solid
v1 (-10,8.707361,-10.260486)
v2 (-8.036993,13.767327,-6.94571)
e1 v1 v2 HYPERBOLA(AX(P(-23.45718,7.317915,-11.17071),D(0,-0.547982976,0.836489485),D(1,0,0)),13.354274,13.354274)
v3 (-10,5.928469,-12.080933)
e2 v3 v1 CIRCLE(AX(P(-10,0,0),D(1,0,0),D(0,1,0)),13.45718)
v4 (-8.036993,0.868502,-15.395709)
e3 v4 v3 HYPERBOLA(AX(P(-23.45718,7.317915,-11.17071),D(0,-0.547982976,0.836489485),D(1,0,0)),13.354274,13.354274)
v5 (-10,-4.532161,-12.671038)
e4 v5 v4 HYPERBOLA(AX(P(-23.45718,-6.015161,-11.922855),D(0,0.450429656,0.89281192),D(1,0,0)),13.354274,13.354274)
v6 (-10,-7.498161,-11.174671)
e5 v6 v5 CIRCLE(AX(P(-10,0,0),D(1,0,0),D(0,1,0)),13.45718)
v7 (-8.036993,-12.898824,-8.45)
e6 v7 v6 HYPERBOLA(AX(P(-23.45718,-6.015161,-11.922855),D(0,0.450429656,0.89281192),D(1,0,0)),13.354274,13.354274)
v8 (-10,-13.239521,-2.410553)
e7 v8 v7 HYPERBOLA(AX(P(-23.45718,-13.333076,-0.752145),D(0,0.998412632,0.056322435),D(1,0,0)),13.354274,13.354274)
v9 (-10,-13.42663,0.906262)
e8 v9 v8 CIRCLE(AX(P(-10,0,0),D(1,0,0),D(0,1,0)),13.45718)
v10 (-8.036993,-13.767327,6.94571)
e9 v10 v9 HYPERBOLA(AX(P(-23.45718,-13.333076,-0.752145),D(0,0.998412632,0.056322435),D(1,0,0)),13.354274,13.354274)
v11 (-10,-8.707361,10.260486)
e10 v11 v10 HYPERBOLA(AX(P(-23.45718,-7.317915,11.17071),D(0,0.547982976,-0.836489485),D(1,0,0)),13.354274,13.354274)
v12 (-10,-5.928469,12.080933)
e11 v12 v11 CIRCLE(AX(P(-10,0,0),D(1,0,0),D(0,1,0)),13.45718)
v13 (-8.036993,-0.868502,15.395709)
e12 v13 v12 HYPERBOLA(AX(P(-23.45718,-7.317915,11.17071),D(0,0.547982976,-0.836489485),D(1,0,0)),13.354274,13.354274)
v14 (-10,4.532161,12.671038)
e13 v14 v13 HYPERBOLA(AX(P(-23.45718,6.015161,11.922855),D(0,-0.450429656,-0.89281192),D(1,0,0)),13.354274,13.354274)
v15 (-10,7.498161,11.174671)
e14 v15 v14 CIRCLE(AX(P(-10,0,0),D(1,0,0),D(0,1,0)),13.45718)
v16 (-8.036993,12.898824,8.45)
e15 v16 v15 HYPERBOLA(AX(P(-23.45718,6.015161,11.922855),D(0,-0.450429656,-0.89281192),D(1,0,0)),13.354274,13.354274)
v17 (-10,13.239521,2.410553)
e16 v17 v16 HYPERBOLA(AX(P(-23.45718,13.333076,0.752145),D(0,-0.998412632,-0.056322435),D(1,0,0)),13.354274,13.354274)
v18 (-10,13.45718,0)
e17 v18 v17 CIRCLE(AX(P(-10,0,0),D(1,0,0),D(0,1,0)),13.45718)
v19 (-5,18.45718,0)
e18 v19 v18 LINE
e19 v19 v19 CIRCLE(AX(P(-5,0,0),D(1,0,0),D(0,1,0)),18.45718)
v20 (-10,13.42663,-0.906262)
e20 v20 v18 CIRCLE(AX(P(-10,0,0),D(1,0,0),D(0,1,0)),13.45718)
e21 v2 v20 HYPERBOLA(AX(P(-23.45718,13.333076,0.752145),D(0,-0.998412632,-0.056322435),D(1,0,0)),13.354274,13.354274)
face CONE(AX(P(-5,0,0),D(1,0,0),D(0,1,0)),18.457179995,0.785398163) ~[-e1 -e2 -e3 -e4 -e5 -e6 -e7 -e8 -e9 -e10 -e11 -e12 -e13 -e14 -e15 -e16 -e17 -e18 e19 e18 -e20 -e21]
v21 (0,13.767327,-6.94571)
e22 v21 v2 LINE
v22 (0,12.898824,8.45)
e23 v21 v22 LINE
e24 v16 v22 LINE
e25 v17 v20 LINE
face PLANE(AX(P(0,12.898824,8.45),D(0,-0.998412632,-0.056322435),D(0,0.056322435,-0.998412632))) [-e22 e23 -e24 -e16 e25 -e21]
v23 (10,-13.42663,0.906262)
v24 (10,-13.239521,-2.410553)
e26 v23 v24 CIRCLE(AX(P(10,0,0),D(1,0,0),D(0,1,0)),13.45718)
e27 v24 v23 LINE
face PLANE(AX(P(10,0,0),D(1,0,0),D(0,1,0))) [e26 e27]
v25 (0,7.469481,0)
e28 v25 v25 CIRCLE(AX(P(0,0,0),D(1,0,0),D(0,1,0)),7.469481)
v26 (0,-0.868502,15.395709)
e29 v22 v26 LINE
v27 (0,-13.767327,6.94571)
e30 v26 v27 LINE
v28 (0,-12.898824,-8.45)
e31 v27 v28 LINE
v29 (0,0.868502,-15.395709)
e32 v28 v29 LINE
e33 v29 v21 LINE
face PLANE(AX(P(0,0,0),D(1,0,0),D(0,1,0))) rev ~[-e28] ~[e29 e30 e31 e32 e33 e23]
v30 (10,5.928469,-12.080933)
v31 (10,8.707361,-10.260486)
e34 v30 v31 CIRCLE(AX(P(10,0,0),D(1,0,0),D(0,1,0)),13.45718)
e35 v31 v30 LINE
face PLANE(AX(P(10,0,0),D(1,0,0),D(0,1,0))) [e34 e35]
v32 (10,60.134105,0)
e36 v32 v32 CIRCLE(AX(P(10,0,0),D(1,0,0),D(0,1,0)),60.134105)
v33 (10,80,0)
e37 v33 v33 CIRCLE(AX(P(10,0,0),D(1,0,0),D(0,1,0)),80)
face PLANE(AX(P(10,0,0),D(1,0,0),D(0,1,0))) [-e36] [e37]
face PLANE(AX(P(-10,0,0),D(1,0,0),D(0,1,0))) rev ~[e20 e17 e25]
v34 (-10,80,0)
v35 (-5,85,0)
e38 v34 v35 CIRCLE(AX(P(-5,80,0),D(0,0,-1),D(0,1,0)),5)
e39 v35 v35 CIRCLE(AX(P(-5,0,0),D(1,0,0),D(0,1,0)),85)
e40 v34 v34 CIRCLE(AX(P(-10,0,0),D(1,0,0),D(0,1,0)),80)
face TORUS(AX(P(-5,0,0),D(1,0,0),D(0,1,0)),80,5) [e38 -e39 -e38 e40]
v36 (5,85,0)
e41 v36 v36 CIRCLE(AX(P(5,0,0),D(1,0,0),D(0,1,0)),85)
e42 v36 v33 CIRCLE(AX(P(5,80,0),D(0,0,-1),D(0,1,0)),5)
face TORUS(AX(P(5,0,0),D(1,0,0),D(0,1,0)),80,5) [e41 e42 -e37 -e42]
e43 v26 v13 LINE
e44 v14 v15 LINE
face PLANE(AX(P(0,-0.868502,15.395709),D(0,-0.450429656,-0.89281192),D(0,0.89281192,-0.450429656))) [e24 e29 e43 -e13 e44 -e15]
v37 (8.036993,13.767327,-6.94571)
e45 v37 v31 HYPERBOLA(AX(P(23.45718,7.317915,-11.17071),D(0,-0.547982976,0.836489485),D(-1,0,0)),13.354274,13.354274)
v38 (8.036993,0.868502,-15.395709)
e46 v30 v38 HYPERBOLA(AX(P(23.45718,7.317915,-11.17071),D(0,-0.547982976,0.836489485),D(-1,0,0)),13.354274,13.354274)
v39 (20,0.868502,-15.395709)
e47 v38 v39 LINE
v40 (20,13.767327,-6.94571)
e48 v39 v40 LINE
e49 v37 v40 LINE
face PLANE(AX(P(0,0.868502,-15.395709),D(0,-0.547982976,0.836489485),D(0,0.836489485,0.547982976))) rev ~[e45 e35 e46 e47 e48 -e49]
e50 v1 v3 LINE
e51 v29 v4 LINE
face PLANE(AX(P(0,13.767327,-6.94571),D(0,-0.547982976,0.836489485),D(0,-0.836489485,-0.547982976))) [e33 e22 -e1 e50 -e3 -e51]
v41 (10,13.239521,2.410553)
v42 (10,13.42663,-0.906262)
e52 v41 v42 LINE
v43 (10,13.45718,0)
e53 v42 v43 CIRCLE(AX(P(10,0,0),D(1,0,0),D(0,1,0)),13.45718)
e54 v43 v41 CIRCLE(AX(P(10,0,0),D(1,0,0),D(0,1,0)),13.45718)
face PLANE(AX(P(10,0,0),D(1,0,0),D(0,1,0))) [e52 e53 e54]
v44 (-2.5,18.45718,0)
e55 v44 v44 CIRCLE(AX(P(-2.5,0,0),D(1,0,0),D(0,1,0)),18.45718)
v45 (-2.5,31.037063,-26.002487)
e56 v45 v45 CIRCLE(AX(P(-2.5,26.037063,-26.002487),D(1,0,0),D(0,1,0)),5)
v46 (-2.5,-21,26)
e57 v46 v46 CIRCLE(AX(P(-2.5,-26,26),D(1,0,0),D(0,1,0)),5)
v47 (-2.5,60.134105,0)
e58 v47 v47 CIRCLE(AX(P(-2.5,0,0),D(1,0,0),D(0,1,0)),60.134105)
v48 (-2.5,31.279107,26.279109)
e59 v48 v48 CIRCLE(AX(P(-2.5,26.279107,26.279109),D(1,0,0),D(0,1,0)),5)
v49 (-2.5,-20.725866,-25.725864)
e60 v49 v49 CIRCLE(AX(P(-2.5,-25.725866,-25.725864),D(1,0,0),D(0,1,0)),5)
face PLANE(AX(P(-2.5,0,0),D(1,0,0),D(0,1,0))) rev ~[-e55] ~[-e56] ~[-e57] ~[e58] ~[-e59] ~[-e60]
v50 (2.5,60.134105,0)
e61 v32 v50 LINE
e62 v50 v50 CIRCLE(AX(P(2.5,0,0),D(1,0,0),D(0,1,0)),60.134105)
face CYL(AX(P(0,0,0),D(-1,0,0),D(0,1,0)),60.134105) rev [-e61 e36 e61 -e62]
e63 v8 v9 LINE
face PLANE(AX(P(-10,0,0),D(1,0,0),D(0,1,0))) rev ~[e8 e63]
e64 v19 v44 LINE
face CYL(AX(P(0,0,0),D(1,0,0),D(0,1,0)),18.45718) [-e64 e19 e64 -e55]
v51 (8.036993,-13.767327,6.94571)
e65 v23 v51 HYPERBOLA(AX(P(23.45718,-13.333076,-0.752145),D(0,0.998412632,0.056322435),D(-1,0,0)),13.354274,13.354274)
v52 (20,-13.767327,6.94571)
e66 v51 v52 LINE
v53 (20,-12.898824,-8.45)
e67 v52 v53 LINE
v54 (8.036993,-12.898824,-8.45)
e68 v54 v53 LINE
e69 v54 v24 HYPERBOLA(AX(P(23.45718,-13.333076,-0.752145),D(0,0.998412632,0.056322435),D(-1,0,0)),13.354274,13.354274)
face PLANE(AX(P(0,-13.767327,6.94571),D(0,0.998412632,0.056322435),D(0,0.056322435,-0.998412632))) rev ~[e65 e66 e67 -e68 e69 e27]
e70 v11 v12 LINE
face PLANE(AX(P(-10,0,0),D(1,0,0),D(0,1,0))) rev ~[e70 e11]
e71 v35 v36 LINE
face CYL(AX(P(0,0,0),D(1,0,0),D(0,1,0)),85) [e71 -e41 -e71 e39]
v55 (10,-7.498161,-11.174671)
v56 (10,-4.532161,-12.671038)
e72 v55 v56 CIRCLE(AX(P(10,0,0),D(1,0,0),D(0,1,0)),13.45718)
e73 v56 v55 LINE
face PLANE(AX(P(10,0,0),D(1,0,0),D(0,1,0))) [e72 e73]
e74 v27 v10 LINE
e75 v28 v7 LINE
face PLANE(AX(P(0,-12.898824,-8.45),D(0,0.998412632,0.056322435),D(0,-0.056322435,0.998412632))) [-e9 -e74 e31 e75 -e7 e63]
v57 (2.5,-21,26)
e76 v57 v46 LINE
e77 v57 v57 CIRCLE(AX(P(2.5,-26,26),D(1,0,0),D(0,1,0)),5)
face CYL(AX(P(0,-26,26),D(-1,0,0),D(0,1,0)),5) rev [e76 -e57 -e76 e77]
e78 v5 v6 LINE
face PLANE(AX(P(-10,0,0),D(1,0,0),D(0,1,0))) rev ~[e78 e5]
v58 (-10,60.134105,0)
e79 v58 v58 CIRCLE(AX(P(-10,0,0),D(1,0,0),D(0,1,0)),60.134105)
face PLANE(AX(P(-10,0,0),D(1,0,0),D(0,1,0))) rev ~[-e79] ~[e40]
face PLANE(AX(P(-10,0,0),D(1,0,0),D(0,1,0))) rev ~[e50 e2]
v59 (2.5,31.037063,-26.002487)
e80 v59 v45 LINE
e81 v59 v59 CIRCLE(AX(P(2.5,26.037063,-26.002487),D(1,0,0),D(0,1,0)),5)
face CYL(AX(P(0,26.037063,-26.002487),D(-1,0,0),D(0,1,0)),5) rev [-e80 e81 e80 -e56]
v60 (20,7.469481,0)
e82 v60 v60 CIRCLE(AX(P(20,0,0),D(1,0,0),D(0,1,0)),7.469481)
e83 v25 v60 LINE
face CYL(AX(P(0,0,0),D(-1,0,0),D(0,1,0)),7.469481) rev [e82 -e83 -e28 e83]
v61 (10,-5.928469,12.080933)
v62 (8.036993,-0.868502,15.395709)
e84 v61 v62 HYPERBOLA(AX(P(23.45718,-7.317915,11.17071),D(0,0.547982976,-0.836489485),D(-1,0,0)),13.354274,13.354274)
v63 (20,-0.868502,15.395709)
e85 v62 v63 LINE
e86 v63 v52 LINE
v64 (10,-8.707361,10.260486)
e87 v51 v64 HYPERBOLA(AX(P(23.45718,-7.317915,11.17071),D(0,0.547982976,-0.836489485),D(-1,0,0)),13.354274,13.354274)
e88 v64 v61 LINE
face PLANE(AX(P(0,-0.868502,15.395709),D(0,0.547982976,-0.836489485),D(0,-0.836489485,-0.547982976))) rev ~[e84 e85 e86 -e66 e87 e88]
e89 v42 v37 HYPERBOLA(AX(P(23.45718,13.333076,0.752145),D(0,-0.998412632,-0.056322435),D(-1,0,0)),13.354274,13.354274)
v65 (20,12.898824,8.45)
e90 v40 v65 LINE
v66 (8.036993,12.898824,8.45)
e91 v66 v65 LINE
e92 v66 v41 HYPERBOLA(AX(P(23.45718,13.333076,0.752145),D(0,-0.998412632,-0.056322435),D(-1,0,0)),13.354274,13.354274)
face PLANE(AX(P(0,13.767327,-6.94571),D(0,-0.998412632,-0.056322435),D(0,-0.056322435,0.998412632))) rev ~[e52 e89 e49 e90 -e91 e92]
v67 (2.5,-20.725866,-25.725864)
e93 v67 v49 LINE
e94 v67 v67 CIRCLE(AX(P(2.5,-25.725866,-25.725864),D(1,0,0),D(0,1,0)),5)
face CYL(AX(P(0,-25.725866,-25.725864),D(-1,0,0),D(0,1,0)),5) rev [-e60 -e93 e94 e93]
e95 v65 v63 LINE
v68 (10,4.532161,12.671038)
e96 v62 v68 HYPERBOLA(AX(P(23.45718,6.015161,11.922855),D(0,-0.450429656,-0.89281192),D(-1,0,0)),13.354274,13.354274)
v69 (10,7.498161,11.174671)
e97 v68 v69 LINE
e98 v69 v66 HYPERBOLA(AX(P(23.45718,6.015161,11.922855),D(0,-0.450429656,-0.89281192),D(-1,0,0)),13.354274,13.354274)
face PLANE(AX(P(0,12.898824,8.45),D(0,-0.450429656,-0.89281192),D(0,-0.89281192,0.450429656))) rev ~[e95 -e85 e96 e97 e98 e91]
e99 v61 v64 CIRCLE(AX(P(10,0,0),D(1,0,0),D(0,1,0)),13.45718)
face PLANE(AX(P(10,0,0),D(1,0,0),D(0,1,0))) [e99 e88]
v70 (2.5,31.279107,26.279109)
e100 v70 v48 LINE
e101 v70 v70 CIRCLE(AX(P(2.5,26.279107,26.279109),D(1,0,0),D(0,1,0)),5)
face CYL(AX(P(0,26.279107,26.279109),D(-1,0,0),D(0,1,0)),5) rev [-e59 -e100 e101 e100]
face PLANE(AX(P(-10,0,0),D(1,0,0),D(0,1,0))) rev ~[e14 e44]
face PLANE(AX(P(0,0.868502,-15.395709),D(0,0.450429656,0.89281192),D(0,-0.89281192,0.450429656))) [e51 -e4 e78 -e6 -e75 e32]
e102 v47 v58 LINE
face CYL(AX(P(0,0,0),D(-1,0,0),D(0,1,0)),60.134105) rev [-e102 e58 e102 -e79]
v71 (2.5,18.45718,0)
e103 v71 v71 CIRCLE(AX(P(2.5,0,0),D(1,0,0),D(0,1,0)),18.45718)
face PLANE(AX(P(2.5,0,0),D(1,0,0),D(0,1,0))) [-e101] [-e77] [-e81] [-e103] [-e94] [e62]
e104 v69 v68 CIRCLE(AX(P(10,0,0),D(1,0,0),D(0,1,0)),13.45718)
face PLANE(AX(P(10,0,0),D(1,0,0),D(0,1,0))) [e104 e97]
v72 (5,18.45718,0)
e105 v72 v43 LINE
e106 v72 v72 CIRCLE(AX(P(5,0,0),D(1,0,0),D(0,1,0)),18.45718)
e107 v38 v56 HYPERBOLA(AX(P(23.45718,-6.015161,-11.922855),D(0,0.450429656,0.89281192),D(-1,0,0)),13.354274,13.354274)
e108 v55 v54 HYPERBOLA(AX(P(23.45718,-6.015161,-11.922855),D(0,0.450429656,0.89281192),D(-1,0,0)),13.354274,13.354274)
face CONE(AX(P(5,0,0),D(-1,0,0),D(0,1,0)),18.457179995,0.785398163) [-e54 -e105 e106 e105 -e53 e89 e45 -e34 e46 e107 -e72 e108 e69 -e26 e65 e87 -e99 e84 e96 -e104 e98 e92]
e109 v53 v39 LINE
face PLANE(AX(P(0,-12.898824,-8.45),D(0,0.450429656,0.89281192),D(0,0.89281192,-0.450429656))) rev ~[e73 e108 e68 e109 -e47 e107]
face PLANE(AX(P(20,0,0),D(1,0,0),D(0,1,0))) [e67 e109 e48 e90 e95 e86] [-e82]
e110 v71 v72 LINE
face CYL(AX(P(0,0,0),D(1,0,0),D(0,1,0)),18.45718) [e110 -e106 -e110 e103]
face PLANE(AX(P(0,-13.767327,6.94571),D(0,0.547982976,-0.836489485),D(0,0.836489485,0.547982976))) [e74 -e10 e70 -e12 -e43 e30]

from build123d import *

# Parameters (mm, degrees)
F0_R     = 85
F0_R_2   = 60.1341050947
F1_DEPTH = 10
F0_R_3   = 5
F0_R_4   = 18.4571799951
F2_DEPTH = 2.5
F3_DEPTH = 10
F4_R     = 5
F0_R_5   = 7.4694808043
F6_DEPTH = 20


# Not quite as in the source:
# - a fillet or chamfer that OpenCascade refuses, or shapes differently, is made with other operations: its cross-section is extruded or revolved along the edge and cut away or added


with BuildPart() as f1:
    # F0 (on Right) → F1 (new body, symmetric)
    with BuildSketch(Plane.YZ):
        Circle(F0_R)
        Circle(F0_R_2, mode=Mode.SUBTRACT)
    extrude(amount=F1_DEPTH, both=True)

    # F0 (on Right) → F2 (join, symmetric)
    with BuildSketch(Plane.YZ):
        Circle(F0_R_2)
        with Locations((-25.7258657366, -25.725863874)):
            Circle(F0_R_3, mode=Mode.SUBTRACT)
        with Locations((26.0370634496, -26.0024871677)):
            Circle(F0_R_3, mode=Mode.SUBTRACT)
        with Locations((-26, 26)):
            Circle(F0_R_3, mode=Mode.SUBTRACT)
        Circle(F0_R_4, mode=Mode.SUBTRACT)
        with Locations((26.2791067362, 26.2791085988)):
            Circle(F0_R_3, mode=Mode.SUBTRACT)
    extrude(amount=F2_DEPTH, both=True)

    # F0 (on Right) → F3 (join, symmetric)
    with BuildSketch(Plane.YZ):
        Circle(F0_R_4)
        Polygon((12.8988242803, 8.4499999602), (13.7673267676, -6.9457095256), (0.8685024874, -15.3957094858), (-12.8988242803, -8.4499999602), (-13.7673267676, 6.9457095256), (-0.8685024874, 15.3957094858), align=None, mode=Mode.SUBTRACT)
    extrude(amount=F3_DEPTH, both=True)

    # F4
    f4_edges = [f1.edges().sort_by_distance(p)[0] for p in [
        (-10, -85, 0),
        (10, -85, 0),
    ]]
    fillet(f4_edges, radius=F4_R)

    # F5: chamfer of 5 on 2 edges, made by hand

    # F5_s1 → F5_t2 (revolve, cut)
    with BuildSketch(Plane.XY):
        Polygon((5, 18.4571799951), (10, 13.4571799951), (10, 18.4571799951), align=None)
    revolve(axis=Axis((10, 0, 0), (1, 0, 0)), mode=Mode.SUBTRACT)

    # F5_s3 → F5_t4 (revolve, cut)
    with BuildSketch(Plane.XY):
        Polygon((-5, 18.4571799951), (-10, 13.4571799951), (-10, 18.4571799951), align=None)
    revolve(axis=Axis((-10, 0, 0), (1, 0, 0)), mode=Mode.SUBTRACT)

    # F0 (on Right) → F6 (join)
    with BuildSketch(Plane.YZ):
        Polygon((0.8685024874, -15.3957094858), (13.7673267676, -6.9457095256), (12.8988242803, 8.4499999602), (-0.8685024874, 15.3957094858), (-13.7673267676, 6.9457095256), (-12.8988242803, -8.4499999602), align=None)
        Circle(F0_R_5, mode=Mode.SUBTRACT)
    extrude(amount=F6_DEPTH)


solid = f1.part
